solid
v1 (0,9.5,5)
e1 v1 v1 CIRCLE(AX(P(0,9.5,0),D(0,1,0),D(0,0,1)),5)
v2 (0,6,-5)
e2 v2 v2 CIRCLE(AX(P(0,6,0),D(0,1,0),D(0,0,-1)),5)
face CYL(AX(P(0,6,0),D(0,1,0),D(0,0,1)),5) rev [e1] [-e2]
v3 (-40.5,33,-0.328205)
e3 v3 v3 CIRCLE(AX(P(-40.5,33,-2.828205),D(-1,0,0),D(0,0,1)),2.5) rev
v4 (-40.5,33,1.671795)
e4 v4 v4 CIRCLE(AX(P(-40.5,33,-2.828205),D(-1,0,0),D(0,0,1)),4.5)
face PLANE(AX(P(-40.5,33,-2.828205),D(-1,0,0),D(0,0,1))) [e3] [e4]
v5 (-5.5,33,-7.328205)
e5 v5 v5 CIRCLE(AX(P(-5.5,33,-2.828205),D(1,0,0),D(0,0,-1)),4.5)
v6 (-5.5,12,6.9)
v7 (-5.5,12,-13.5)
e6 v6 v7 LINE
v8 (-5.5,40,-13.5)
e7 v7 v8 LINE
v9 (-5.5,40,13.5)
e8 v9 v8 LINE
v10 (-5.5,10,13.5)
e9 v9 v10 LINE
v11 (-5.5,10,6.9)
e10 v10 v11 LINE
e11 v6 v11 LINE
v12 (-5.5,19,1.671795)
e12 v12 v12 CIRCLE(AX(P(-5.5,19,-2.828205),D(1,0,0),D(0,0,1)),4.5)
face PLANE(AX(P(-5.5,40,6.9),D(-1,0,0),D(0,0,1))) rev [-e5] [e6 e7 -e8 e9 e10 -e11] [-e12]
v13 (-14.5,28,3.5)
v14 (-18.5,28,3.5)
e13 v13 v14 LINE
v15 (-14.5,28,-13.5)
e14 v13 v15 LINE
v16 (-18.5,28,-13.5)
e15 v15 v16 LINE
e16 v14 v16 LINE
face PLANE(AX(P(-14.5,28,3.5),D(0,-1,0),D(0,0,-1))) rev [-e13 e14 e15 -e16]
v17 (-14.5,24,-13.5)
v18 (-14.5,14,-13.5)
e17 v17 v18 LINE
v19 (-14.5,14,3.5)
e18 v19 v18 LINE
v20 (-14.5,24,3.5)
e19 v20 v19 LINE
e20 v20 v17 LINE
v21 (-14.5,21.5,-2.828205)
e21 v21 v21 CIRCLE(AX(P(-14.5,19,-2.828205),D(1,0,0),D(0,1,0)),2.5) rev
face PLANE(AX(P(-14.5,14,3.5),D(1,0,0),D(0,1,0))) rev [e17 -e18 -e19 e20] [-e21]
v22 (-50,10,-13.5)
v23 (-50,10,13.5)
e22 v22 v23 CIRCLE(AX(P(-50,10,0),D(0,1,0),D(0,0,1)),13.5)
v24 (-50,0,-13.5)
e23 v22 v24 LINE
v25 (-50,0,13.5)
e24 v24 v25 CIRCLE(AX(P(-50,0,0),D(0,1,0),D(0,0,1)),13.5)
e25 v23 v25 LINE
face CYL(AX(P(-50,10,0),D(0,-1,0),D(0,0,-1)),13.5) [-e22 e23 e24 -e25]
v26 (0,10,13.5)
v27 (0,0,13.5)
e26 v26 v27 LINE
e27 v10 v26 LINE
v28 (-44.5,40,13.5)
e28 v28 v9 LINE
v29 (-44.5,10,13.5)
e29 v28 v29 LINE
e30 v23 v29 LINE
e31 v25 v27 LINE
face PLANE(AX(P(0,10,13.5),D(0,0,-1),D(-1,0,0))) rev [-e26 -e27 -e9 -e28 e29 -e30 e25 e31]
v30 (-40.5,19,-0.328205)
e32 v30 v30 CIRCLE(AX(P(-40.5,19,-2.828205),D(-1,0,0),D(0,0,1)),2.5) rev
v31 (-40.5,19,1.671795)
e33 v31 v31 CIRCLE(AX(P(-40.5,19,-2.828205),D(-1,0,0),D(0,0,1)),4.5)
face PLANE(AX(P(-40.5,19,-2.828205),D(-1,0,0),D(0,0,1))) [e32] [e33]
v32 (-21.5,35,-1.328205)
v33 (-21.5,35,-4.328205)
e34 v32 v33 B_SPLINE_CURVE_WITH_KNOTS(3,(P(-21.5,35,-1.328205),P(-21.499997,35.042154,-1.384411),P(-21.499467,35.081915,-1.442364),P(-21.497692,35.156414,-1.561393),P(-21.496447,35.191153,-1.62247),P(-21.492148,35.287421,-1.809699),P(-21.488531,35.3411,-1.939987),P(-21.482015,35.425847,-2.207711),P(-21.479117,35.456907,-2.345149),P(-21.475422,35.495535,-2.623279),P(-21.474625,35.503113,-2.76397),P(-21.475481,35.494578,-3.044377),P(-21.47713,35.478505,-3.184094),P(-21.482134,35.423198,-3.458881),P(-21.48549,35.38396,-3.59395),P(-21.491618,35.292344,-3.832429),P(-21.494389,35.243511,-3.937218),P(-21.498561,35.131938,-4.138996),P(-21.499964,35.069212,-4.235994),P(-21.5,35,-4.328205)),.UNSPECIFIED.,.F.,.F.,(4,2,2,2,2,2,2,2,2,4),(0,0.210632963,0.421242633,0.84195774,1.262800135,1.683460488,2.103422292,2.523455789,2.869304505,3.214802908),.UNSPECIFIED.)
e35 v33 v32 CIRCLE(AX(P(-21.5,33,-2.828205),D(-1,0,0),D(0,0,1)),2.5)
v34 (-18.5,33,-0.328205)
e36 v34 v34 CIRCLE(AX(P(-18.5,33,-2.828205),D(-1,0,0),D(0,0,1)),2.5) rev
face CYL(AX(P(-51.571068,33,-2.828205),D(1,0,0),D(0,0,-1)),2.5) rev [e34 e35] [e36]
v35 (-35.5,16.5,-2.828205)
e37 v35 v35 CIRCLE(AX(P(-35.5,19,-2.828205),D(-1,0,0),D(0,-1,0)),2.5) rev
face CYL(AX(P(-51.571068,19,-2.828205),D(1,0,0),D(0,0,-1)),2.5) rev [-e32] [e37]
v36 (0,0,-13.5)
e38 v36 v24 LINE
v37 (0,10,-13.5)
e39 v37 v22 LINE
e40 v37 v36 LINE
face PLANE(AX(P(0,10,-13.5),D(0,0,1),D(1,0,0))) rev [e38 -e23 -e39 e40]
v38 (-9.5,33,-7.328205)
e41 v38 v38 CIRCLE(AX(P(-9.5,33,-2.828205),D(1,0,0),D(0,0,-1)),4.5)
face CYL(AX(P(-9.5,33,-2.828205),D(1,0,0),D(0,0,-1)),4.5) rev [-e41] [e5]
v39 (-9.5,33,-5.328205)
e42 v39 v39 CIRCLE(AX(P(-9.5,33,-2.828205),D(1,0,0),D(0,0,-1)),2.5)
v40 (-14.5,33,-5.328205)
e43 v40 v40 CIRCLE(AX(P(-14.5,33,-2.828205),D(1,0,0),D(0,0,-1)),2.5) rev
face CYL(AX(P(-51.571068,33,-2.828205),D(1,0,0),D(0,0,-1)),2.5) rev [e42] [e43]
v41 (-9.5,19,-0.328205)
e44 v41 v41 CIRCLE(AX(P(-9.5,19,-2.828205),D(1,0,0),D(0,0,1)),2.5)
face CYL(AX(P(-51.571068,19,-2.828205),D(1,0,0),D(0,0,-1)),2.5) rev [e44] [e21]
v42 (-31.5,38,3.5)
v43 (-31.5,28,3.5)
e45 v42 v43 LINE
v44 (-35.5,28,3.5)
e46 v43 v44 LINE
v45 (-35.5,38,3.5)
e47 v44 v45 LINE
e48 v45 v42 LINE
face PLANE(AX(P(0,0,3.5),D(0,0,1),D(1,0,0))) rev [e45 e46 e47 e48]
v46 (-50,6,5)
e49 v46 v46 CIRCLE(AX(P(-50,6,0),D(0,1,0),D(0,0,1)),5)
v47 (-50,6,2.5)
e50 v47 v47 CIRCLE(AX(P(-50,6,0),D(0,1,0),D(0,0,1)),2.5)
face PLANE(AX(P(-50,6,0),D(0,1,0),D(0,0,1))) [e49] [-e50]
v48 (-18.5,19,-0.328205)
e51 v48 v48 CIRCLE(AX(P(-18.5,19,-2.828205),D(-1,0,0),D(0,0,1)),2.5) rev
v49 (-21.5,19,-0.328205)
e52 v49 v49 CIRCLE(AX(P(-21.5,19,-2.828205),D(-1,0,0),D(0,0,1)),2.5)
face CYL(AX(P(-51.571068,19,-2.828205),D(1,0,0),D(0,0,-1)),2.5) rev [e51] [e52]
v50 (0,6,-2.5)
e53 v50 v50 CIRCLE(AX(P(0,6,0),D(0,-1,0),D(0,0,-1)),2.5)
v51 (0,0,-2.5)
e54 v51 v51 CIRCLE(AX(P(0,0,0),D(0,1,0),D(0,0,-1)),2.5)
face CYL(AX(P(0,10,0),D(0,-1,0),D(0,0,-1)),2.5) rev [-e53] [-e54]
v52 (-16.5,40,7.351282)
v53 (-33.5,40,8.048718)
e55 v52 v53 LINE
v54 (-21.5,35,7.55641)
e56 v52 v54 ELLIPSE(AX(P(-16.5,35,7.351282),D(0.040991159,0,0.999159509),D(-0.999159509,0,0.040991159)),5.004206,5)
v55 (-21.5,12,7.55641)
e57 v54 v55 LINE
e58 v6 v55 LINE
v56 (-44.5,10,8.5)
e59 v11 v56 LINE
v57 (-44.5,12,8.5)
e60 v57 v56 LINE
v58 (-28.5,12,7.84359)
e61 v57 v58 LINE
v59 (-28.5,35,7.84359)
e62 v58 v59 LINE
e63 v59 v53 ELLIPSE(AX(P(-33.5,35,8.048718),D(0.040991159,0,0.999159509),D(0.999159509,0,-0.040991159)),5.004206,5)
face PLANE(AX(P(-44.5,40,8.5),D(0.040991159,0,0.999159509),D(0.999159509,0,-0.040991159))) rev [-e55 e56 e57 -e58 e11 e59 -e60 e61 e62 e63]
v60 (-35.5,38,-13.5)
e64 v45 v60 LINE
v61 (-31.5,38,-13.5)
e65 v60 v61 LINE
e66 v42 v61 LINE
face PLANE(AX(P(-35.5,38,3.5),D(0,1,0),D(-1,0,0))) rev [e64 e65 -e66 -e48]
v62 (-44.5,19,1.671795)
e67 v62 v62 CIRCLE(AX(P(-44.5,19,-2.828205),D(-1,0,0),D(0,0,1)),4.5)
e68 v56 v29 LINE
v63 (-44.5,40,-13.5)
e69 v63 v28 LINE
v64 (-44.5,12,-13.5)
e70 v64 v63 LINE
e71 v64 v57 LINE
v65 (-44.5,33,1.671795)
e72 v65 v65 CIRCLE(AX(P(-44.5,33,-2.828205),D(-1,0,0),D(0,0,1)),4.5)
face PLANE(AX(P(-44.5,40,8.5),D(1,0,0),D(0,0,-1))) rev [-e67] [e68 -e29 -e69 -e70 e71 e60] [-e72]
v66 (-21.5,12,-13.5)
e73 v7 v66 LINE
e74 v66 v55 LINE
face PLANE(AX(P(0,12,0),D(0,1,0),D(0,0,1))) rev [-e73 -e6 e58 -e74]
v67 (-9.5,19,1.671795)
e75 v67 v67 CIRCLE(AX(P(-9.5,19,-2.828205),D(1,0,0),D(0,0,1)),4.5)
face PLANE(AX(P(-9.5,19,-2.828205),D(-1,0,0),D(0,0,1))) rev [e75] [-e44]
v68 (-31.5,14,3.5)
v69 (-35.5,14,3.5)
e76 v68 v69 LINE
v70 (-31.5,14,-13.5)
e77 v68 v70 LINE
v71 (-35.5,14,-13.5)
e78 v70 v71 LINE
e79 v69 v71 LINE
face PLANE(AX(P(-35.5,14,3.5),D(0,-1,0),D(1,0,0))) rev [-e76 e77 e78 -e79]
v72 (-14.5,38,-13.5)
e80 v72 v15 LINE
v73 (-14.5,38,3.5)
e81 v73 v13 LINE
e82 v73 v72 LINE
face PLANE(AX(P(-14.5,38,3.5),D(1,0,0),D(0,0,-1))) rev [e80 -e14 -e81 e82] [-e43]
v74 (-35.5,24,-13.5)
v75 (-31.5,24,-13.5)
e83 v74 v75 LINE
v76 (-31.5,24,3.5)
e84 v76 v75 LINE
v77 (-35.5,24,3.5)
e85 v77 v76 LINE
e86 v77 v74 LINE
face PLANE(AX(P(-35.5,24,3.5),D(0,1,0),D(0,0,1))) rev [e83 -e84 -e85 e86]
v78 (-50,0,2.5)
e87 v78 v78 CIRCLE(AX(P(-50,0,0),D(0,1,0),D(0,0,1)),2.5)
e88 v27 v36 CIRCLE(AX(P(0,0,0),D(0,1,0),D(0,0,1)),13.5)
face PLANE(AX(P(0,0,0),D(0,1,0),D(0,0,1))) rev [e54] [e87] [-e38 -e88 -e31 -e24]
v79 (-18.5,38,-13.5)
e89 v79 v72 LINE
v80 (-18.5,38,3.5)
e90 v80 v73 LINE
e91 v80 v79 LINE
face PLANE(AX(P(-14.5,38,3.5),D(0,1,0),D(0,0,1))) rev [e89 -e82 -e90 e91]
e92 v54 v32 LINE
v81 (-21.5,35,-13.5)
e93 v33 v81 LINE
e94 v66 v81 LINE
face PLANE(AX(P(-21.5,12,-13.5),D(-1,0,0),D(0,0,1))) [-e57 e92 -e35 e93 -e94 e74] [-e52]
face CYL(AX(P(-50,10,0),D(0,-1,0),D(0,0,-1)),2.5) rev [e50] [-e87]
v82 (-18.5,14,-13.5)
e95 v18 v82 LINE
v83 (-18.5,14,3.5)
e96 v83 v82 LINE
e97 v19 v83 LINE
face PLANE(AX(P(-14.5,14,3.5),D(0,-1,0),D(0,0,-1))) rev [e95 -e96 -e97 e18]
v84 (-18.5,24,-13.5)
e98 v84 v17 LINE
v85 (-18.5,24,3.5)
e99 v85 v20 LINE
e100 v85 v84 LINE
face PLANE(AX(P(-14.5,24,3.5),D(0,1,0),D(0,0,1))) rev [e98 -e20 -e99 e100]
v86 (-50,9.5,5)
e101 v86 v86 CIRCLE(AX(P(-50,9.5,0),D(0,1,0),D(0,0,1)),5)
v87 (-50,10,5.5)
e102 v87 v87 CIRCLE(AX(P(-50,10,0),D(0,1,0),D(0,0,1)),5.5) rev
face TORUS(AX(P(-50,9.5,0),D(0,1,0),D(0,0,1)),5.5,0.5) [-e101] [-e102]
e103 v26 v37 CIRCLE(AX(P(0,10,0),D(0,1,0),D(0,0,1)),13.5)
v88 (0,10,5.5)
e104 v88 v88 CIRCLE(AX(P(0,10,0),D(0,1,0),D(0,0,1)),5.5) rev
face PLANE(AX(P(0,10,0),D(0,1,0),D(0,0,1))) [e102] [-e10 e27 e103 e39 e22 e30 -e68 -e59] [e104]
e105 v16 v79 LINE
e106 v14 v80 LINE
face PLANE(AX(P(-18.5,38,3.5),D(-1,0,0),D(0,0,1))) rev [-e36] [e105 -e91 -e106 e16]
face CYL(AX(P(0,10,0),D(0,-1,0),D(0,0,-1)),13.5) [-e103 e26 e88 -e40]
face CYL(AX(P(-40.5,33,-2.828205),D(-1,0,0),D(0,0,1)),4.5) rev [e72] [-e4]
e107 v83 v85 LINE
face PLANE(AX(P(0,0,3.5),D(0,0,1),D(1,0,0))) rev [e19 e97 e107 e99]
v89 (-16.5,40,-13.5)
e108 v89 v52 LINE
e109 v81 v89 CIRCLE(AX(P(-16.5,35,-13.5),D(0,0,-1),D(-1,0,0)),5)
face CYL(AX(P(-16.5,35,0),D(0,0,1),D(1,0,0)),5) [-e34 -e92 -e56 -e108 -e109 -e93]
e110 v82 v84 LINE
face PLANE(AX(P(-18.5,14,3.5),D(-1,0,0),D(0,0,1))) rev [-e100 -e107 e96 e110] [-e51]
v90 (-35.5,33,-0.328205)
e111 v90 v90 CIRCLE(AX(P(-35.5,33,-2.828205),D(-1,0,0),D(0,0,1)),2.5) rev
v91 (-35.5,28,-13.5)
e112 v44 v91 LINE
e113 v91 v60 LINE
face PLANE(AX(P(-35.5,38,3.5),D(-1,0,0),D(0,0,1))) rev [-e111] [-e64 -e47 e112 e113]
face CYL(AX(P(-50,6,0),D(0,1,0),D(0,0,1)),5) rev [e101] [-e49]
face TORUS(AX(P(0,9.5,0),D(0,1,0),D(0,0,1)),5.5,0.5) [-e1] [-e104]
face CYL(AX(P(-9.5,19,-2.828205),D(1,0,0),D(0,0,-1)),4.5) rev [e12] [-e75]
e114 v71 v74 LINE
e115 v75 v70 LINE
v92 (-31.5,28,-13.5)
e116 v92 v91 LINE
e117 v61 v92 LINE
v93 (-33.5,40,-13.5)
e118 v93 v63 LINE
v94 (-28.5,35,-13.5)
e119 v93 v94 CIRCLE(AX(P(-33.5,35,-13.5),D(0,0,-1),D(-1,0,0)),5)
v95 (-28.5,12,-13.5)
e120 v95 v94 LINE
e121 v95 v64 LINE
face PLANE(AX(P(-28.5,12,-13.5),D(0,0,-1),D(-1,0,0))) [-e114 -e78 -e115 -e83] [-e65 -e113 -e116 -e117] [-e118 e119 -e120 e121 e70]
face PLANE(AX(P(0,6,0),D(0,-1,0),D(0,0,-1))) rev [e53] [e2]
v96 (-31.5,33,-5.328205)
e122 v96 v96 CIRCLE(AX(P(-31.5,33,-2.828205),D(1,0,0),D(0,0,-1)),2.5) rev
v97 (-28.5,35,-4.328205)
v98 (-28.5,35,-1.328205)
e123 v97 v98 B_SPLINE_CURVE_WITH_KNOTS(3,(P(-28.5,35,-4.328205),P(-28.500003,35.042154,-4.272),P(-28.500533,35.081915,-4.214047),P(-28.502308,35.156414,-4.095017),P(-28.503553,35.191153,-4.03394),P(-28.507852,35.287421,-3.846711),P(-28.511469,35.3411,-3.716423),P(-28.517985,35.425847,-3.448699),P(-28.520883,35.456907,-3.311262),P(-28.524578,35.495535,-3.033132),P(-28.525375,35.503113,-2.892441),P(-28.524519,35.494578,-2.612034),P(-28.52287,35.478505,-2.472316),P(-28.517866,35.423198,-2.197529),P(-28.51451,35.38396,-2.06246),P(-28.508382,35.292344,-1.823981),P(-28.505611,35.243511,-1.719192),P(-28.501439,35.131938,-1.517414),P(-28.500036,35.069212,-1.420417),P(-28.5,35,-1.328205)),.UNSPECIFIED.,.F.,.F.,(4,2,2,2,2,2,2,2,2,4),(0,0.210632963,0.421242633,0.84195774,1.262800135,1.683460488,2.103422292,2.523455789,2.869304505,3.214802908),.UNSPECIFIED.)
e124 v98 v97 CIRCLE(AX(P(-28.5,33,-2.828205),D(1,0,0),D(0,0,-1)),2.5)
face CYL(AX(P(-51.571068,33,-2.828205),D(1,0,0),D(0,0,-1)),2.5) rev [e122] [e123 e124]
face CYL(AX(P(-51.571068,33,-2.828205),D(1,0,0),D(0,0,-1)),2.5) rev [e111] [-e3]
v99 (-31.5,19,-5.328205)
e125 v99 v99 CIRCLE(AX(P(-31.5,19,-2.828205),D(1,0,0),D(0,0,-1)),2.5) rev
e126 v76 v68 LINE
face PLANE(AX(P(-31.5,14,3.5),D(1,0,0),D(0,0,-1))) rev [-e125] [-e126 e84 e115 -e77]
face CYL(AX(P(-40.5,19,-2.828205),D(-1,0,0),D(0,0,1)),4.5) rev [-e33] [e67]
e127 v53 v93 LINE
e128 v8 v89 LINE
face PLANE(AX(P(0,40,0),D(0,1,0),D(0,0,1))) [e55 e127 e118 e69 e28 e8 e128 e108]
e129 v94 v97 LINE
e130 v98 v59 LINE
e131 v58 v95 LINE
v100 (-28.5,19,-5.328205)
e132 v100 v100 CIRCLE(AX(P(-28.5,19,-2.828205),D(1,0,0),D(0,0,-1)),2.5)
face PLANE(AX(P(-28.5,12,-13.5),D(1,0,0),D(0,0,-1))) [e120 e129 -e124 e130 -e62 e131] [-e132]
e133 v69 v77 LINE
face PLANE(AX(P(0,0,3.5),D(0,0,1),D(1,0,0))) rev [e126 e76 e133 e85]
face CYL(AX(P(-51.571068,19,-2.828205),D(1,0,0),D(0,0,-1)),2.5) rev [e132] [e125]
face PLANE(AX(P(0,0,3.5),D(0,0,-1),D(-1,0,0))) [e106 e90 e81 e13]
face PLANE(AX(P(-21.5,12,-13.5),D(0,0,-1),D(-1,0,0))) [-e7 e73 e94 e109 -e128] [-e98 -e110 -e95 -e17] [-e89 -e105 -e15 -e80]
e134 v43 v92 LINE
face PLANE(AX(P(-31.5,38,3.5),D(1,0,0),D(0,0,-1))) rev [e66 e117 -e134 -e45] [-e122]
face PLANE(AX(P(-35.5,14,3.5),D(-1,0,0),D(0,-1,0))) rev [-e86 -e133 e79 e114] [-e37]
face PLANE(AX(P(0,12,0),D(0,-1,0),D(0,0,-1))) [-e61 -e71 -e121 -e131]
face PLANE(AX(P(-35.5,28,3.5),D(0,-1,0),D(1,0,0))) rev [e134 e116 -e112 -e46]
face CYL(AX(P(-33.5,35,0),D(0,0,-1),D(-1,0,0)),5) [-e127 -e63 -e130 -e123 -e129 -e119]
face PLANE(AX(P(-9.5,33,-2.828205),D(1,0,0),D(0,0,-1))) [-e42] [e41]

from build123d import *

# Parameters (mm, degrees)
CROQUIS1_R              = 2.5
SALIENTE_EXTRUIR1_DEPTH = 10
CROQUIS6_R              = 5
CORTAR_EXTRUIR1_DEPTH   = 4
REDONDEO3_R             = 0.5
SALIENTE_EXTRUIR2_DEPTH = 30
CROQUIS8_W              = 16
CROQUIS8_H              = 22
SALIENTE_EXTRUIR3_DEPTH = 28
CROQUIS9_R              = 4.5
CORTAR_EXTRUIR2_DEPTH   = 4
CORTAR_EXTRUIR3_REACH   = 70.544
CROQUIS10_R             = 2.5
CORTAR_EXTRUIR4_START   = -4
CROQUIS11_R             = 4.5
CORTAR_EXTRUIR4_DEPTH   = 4
REDONDEO4_R             = 5
CROQUIS13_W             = 4
CROQUIS13_H             = 10
CORTAR_EXTRUIR6_DEPTH   = 17


with BuildPart() as part:
    # Croquis1 → Saliente-Extruir1 (new body)
    with BuildSketch(Plane(origin=(0, 0, 0), x_dir=(1, 0, 0), z_dir=(0, 1, 0))):
        with BuildLine():
            Line((0, -13.5), (-50, -13.5))
            ThreePointArc((-50, -13.5), (-63.5, 0), (-50, 13.5))
            Line((-50, 13.5), (0, 13.5))
            ThreePointArc((0, 13.5), (13.5, 0), (0, -13.5))
        make_face()
        with Locations(Location((-50, 0, 0), (0, 0, 270))):
            Circle(CROQUIS1_R, mode=Mode.SUBTRACT)
        with Locations(Location((0, 0, 0), (0, 0, 90))):
            Circle(CROQUIS1_R, mode=Mode.SUBTRACT)
    extrude(amount=SALIENTE_EXTRUIR1_DEPTH)

    # Croquis6 → Cortar-Extruir1 (cut, symmetric)
    with BuildSketch(Plane(origin=(0, 10, 0), x_dir=(1, 0, 0), z_dir=(0, 1, 0))):
        with Locations(Location((-50, 0, 0), (0, 0, 270))):
            Circle(CROQUIS6_R)
        with Locations(Location((0, 0, 0), (0, 0, 270))):
            Circle(CROQUIS6_R)
    extrude(amount=CORTAR_EXTRUIR1_DEPTH, both=True, mode=Mode.SUBTRACT)

    # Redondeo3
    redondeo3_edges = [part.edges().sort_by_distance(p)[0] for p in [
        (-50, 10, -5),
        (0, 10, -5),
    ]]
    fillet(redondeo3_edges, radius=REDONDEO3_R)

    # Croquis7 → Saliente-Extruir2 (add)
    with BuildSketch(Plane(origin=(0, 10, 0), x_dir=(1, 0, 0), z_dir=(0, 1, 0))):
        Polygon((-44.5, -8.5), (-5.5, -6.9), (-5.5, -13.5), (-44.5, -13.5), align=None)
    extrude(amount=SALIENTE_EXTRUIR2_DEPTH)

    # Croquis8 → Saliente-Extruir3 (add)
    with BuildSketch(Plane(origin=(0, 40, 0), x_dir=(1, 0, 0), z_dir=(0, 1, 0))):
        with Locations((-13.5, 2.5)):
            Rectangle(CROQUIS8_W, CROQUIS8_H)
        with Locations((-36.5, 2.5)):
            Rectangle(CROQUIS8_W, CROQUIS8_H)
    extrude(amount=-SALIENTE_EXTRUIR3_DEPTH)

    # Croquis9 → Cortar-Extruir2 (cut)
    with BuildSketch(Plane(origin=(-5.5, 0, 0), x_dir=(0, 0, -1), z_dir=(1, 0, 0))):
        with Locations((2.828205128, 33)):
            Circle(CROQUIS9_R)
        with Locations(Location((2.828205128, 19, 0), (0, 0, 180))):
            Circle(CROQUIS9_R)
    extrude(amount=-CORTAR_EXTRUIR2_DEPTH, mode=Mode.SUBTRACT)

    # Cortar-Extruir3: up to this face of the body (flat: up to its plane)
    cortar_extruir3_end = Plane(part.part.faces().sort_by_distance((-44.5, 25.804177546, 0.143603133))[0])
    # Croquis10 → Cortar-Extruir3 (cut, up to the picked face)
    with BuildSketch(Plane(origin=(-9.5, 0, 0), x_dir=(0, 0, -1), z_dir=(1, 0, 0)), mode=Mode.PRIVATE) as cortar_extruir3_sk1:
        with Locations((2.828205128, 33)):
            Circle(CROQUIS10_R)
    cortar_extruir3_tool1 = split(extrude(cortar_extruir3_sk1.sketch, amount=-CORTAR_EXTRUIR3_REACH, mode=Mode.PRIVATE), bisect_by=cortar_extruir3_end, keep=Keep.BOTH, mode=Mode.PRIVATE)
    # Croquis10 → Cortar-Extruir3 (cut, up to the picked face)
    with BuildSketch(Plane(origin=(-9.5, 0, 0), x_dir=(0, 0, -1), z_dir=(1, 0, 0)), mode=Mode.PRIVATE) as cortar_extruir3_sk2:
        with Locations(Location((2.828205128, 19, 0), (0, 0, 180))):
            Circle(CROQUIS10_R)
    cortar_extruir3_tool2 = split(extrude(cortar_extruir3_sk2.sketch, amount=-CORTAR_EXTRUIR3_REACH, mode=Mode.PRIVATE), bisect_by=cortar_extruir3_end, keep=Keep.BOTH, mode=Mode.PRIVATE)
    add(cortar_extruir3_tool1.solids().sort_by(Axis((-9.5, 33, -2.828205), (-1, 0, 0)))[0], mode=Mode.SUBTRACT)
    add(cortar_extruir3_tool2.solids().sort_by(Axis((-9.5, 19, -2.828205), (-1, 0, 0)))[0], mode=Mode.SUBTRACT)

    # Croquis11 → Cortar-Extruir4 (cut)
    with BuildSketch(Plane.ZY.offset(44.5).offset(CORTAR_EXTRUIR4_START)):
        with Locations(Location((-2.828205128, 33, 0), (0, 0, 180))):
            Circle(CROQUIS11_R)
        with Locations((-2.828205128, 19)):
            Circle(CROQUIS11_R)
    extrude(amount=CORTAR_EXTRUIR4_DEPTH, mode=Mode.SUBTRACT)

    # Redondeo4
    # the kernel refuses this fillet: 5 mm, written as the material it takes off along each edge
    with BuildSketch(Plane(origin=(-28.5, 40, 20.343589744), x_dir=(-1, 0, 0), z_dir=(0, 0, -1))) as redondeo4_piece_1_section:
        with BuildLine():
            CenterArc((REDONDEO4_R, -REDONDEO4_R), REDONDEO4_R, 90, 90)
            Line((0, -REDONDEO4_R), (0, 0))
            Line((0, 0), (REDONDEO4_R, 0))
        make_face()
    redondeo4_piece_1 = extrude(amount=46.343589744, mode=Mode.PRIVATE)
    redondeo4_piece_1 = split(redondeo4_piece_1, bisect_by=Plane(origin=(-29.180561705, 38.884335507, 7.871510224), z_dir=(-0.04099115935241428, 0, -0.9991595092150929)), keep=Keep.TOP, mode=Mode.PRIVATE)
    add(redondeo4_piece_1, mode=Mode.SUBTRACT)
    with BuildSketch(Plane(origin=(-21.5, 40, -26), x_dir=(1, 0, 0), z_dir=(0, 0, 1))) as redondeo4_piece_2_section:
        with BuildLine():
            CenterArc((REDONDEO4_R, -REDONDEO4_R), REDONDEO4_R, 90, 90)
            Line((0, -REDONDEO4_R), (0, 0))
            Line((0, 0), (REDONDEO4_R, 0))
        make_face()
    redondeo4_piece_2 = extrude(amount=46.056410256, mode=Mode.PRIVATE)
    redondeo4_piece_2 = split(redondeo4_piece_2, bisect_by=Plane(origin=(-19.954554265, 38.882337261, 7.493007354), z_dir=(-0.04099115935241428, 0, -0.9991595092150929)), keep=Keep.TOP, mode=Mode.PRIVATE)
    add(redondeo4_piece_2, mode=Mode.SUBTRACT)

    # Croquis13 → Cortar-Extruir6 (cut)
    with BuildSketch(Plane(origin=(0, 0, -13.5), x_dir=(-1, 0, 0), z_dir=(0, 0, -1))):
        with Locations((16.5, 33)):
            Rectangle(CROQUIS13_W, CROQUIS13_H)
        with Locations((16.5, 19)):
            Rectangle(CROQUIS13_W, CROQUIS13_H)
        with Locations((33.5, 19)):
            Rectangle(CROQUIS13_W, CROQUIS13_H)
        with Locations((33.5, 33)):
            Rectangle(CROQUIS13_W, CROQUIS13_H)
    extrude(amount=-CORTAR_EXTRUIR6_DEPTH, mode=Mode.SUBTRACT)


solid = part.part
